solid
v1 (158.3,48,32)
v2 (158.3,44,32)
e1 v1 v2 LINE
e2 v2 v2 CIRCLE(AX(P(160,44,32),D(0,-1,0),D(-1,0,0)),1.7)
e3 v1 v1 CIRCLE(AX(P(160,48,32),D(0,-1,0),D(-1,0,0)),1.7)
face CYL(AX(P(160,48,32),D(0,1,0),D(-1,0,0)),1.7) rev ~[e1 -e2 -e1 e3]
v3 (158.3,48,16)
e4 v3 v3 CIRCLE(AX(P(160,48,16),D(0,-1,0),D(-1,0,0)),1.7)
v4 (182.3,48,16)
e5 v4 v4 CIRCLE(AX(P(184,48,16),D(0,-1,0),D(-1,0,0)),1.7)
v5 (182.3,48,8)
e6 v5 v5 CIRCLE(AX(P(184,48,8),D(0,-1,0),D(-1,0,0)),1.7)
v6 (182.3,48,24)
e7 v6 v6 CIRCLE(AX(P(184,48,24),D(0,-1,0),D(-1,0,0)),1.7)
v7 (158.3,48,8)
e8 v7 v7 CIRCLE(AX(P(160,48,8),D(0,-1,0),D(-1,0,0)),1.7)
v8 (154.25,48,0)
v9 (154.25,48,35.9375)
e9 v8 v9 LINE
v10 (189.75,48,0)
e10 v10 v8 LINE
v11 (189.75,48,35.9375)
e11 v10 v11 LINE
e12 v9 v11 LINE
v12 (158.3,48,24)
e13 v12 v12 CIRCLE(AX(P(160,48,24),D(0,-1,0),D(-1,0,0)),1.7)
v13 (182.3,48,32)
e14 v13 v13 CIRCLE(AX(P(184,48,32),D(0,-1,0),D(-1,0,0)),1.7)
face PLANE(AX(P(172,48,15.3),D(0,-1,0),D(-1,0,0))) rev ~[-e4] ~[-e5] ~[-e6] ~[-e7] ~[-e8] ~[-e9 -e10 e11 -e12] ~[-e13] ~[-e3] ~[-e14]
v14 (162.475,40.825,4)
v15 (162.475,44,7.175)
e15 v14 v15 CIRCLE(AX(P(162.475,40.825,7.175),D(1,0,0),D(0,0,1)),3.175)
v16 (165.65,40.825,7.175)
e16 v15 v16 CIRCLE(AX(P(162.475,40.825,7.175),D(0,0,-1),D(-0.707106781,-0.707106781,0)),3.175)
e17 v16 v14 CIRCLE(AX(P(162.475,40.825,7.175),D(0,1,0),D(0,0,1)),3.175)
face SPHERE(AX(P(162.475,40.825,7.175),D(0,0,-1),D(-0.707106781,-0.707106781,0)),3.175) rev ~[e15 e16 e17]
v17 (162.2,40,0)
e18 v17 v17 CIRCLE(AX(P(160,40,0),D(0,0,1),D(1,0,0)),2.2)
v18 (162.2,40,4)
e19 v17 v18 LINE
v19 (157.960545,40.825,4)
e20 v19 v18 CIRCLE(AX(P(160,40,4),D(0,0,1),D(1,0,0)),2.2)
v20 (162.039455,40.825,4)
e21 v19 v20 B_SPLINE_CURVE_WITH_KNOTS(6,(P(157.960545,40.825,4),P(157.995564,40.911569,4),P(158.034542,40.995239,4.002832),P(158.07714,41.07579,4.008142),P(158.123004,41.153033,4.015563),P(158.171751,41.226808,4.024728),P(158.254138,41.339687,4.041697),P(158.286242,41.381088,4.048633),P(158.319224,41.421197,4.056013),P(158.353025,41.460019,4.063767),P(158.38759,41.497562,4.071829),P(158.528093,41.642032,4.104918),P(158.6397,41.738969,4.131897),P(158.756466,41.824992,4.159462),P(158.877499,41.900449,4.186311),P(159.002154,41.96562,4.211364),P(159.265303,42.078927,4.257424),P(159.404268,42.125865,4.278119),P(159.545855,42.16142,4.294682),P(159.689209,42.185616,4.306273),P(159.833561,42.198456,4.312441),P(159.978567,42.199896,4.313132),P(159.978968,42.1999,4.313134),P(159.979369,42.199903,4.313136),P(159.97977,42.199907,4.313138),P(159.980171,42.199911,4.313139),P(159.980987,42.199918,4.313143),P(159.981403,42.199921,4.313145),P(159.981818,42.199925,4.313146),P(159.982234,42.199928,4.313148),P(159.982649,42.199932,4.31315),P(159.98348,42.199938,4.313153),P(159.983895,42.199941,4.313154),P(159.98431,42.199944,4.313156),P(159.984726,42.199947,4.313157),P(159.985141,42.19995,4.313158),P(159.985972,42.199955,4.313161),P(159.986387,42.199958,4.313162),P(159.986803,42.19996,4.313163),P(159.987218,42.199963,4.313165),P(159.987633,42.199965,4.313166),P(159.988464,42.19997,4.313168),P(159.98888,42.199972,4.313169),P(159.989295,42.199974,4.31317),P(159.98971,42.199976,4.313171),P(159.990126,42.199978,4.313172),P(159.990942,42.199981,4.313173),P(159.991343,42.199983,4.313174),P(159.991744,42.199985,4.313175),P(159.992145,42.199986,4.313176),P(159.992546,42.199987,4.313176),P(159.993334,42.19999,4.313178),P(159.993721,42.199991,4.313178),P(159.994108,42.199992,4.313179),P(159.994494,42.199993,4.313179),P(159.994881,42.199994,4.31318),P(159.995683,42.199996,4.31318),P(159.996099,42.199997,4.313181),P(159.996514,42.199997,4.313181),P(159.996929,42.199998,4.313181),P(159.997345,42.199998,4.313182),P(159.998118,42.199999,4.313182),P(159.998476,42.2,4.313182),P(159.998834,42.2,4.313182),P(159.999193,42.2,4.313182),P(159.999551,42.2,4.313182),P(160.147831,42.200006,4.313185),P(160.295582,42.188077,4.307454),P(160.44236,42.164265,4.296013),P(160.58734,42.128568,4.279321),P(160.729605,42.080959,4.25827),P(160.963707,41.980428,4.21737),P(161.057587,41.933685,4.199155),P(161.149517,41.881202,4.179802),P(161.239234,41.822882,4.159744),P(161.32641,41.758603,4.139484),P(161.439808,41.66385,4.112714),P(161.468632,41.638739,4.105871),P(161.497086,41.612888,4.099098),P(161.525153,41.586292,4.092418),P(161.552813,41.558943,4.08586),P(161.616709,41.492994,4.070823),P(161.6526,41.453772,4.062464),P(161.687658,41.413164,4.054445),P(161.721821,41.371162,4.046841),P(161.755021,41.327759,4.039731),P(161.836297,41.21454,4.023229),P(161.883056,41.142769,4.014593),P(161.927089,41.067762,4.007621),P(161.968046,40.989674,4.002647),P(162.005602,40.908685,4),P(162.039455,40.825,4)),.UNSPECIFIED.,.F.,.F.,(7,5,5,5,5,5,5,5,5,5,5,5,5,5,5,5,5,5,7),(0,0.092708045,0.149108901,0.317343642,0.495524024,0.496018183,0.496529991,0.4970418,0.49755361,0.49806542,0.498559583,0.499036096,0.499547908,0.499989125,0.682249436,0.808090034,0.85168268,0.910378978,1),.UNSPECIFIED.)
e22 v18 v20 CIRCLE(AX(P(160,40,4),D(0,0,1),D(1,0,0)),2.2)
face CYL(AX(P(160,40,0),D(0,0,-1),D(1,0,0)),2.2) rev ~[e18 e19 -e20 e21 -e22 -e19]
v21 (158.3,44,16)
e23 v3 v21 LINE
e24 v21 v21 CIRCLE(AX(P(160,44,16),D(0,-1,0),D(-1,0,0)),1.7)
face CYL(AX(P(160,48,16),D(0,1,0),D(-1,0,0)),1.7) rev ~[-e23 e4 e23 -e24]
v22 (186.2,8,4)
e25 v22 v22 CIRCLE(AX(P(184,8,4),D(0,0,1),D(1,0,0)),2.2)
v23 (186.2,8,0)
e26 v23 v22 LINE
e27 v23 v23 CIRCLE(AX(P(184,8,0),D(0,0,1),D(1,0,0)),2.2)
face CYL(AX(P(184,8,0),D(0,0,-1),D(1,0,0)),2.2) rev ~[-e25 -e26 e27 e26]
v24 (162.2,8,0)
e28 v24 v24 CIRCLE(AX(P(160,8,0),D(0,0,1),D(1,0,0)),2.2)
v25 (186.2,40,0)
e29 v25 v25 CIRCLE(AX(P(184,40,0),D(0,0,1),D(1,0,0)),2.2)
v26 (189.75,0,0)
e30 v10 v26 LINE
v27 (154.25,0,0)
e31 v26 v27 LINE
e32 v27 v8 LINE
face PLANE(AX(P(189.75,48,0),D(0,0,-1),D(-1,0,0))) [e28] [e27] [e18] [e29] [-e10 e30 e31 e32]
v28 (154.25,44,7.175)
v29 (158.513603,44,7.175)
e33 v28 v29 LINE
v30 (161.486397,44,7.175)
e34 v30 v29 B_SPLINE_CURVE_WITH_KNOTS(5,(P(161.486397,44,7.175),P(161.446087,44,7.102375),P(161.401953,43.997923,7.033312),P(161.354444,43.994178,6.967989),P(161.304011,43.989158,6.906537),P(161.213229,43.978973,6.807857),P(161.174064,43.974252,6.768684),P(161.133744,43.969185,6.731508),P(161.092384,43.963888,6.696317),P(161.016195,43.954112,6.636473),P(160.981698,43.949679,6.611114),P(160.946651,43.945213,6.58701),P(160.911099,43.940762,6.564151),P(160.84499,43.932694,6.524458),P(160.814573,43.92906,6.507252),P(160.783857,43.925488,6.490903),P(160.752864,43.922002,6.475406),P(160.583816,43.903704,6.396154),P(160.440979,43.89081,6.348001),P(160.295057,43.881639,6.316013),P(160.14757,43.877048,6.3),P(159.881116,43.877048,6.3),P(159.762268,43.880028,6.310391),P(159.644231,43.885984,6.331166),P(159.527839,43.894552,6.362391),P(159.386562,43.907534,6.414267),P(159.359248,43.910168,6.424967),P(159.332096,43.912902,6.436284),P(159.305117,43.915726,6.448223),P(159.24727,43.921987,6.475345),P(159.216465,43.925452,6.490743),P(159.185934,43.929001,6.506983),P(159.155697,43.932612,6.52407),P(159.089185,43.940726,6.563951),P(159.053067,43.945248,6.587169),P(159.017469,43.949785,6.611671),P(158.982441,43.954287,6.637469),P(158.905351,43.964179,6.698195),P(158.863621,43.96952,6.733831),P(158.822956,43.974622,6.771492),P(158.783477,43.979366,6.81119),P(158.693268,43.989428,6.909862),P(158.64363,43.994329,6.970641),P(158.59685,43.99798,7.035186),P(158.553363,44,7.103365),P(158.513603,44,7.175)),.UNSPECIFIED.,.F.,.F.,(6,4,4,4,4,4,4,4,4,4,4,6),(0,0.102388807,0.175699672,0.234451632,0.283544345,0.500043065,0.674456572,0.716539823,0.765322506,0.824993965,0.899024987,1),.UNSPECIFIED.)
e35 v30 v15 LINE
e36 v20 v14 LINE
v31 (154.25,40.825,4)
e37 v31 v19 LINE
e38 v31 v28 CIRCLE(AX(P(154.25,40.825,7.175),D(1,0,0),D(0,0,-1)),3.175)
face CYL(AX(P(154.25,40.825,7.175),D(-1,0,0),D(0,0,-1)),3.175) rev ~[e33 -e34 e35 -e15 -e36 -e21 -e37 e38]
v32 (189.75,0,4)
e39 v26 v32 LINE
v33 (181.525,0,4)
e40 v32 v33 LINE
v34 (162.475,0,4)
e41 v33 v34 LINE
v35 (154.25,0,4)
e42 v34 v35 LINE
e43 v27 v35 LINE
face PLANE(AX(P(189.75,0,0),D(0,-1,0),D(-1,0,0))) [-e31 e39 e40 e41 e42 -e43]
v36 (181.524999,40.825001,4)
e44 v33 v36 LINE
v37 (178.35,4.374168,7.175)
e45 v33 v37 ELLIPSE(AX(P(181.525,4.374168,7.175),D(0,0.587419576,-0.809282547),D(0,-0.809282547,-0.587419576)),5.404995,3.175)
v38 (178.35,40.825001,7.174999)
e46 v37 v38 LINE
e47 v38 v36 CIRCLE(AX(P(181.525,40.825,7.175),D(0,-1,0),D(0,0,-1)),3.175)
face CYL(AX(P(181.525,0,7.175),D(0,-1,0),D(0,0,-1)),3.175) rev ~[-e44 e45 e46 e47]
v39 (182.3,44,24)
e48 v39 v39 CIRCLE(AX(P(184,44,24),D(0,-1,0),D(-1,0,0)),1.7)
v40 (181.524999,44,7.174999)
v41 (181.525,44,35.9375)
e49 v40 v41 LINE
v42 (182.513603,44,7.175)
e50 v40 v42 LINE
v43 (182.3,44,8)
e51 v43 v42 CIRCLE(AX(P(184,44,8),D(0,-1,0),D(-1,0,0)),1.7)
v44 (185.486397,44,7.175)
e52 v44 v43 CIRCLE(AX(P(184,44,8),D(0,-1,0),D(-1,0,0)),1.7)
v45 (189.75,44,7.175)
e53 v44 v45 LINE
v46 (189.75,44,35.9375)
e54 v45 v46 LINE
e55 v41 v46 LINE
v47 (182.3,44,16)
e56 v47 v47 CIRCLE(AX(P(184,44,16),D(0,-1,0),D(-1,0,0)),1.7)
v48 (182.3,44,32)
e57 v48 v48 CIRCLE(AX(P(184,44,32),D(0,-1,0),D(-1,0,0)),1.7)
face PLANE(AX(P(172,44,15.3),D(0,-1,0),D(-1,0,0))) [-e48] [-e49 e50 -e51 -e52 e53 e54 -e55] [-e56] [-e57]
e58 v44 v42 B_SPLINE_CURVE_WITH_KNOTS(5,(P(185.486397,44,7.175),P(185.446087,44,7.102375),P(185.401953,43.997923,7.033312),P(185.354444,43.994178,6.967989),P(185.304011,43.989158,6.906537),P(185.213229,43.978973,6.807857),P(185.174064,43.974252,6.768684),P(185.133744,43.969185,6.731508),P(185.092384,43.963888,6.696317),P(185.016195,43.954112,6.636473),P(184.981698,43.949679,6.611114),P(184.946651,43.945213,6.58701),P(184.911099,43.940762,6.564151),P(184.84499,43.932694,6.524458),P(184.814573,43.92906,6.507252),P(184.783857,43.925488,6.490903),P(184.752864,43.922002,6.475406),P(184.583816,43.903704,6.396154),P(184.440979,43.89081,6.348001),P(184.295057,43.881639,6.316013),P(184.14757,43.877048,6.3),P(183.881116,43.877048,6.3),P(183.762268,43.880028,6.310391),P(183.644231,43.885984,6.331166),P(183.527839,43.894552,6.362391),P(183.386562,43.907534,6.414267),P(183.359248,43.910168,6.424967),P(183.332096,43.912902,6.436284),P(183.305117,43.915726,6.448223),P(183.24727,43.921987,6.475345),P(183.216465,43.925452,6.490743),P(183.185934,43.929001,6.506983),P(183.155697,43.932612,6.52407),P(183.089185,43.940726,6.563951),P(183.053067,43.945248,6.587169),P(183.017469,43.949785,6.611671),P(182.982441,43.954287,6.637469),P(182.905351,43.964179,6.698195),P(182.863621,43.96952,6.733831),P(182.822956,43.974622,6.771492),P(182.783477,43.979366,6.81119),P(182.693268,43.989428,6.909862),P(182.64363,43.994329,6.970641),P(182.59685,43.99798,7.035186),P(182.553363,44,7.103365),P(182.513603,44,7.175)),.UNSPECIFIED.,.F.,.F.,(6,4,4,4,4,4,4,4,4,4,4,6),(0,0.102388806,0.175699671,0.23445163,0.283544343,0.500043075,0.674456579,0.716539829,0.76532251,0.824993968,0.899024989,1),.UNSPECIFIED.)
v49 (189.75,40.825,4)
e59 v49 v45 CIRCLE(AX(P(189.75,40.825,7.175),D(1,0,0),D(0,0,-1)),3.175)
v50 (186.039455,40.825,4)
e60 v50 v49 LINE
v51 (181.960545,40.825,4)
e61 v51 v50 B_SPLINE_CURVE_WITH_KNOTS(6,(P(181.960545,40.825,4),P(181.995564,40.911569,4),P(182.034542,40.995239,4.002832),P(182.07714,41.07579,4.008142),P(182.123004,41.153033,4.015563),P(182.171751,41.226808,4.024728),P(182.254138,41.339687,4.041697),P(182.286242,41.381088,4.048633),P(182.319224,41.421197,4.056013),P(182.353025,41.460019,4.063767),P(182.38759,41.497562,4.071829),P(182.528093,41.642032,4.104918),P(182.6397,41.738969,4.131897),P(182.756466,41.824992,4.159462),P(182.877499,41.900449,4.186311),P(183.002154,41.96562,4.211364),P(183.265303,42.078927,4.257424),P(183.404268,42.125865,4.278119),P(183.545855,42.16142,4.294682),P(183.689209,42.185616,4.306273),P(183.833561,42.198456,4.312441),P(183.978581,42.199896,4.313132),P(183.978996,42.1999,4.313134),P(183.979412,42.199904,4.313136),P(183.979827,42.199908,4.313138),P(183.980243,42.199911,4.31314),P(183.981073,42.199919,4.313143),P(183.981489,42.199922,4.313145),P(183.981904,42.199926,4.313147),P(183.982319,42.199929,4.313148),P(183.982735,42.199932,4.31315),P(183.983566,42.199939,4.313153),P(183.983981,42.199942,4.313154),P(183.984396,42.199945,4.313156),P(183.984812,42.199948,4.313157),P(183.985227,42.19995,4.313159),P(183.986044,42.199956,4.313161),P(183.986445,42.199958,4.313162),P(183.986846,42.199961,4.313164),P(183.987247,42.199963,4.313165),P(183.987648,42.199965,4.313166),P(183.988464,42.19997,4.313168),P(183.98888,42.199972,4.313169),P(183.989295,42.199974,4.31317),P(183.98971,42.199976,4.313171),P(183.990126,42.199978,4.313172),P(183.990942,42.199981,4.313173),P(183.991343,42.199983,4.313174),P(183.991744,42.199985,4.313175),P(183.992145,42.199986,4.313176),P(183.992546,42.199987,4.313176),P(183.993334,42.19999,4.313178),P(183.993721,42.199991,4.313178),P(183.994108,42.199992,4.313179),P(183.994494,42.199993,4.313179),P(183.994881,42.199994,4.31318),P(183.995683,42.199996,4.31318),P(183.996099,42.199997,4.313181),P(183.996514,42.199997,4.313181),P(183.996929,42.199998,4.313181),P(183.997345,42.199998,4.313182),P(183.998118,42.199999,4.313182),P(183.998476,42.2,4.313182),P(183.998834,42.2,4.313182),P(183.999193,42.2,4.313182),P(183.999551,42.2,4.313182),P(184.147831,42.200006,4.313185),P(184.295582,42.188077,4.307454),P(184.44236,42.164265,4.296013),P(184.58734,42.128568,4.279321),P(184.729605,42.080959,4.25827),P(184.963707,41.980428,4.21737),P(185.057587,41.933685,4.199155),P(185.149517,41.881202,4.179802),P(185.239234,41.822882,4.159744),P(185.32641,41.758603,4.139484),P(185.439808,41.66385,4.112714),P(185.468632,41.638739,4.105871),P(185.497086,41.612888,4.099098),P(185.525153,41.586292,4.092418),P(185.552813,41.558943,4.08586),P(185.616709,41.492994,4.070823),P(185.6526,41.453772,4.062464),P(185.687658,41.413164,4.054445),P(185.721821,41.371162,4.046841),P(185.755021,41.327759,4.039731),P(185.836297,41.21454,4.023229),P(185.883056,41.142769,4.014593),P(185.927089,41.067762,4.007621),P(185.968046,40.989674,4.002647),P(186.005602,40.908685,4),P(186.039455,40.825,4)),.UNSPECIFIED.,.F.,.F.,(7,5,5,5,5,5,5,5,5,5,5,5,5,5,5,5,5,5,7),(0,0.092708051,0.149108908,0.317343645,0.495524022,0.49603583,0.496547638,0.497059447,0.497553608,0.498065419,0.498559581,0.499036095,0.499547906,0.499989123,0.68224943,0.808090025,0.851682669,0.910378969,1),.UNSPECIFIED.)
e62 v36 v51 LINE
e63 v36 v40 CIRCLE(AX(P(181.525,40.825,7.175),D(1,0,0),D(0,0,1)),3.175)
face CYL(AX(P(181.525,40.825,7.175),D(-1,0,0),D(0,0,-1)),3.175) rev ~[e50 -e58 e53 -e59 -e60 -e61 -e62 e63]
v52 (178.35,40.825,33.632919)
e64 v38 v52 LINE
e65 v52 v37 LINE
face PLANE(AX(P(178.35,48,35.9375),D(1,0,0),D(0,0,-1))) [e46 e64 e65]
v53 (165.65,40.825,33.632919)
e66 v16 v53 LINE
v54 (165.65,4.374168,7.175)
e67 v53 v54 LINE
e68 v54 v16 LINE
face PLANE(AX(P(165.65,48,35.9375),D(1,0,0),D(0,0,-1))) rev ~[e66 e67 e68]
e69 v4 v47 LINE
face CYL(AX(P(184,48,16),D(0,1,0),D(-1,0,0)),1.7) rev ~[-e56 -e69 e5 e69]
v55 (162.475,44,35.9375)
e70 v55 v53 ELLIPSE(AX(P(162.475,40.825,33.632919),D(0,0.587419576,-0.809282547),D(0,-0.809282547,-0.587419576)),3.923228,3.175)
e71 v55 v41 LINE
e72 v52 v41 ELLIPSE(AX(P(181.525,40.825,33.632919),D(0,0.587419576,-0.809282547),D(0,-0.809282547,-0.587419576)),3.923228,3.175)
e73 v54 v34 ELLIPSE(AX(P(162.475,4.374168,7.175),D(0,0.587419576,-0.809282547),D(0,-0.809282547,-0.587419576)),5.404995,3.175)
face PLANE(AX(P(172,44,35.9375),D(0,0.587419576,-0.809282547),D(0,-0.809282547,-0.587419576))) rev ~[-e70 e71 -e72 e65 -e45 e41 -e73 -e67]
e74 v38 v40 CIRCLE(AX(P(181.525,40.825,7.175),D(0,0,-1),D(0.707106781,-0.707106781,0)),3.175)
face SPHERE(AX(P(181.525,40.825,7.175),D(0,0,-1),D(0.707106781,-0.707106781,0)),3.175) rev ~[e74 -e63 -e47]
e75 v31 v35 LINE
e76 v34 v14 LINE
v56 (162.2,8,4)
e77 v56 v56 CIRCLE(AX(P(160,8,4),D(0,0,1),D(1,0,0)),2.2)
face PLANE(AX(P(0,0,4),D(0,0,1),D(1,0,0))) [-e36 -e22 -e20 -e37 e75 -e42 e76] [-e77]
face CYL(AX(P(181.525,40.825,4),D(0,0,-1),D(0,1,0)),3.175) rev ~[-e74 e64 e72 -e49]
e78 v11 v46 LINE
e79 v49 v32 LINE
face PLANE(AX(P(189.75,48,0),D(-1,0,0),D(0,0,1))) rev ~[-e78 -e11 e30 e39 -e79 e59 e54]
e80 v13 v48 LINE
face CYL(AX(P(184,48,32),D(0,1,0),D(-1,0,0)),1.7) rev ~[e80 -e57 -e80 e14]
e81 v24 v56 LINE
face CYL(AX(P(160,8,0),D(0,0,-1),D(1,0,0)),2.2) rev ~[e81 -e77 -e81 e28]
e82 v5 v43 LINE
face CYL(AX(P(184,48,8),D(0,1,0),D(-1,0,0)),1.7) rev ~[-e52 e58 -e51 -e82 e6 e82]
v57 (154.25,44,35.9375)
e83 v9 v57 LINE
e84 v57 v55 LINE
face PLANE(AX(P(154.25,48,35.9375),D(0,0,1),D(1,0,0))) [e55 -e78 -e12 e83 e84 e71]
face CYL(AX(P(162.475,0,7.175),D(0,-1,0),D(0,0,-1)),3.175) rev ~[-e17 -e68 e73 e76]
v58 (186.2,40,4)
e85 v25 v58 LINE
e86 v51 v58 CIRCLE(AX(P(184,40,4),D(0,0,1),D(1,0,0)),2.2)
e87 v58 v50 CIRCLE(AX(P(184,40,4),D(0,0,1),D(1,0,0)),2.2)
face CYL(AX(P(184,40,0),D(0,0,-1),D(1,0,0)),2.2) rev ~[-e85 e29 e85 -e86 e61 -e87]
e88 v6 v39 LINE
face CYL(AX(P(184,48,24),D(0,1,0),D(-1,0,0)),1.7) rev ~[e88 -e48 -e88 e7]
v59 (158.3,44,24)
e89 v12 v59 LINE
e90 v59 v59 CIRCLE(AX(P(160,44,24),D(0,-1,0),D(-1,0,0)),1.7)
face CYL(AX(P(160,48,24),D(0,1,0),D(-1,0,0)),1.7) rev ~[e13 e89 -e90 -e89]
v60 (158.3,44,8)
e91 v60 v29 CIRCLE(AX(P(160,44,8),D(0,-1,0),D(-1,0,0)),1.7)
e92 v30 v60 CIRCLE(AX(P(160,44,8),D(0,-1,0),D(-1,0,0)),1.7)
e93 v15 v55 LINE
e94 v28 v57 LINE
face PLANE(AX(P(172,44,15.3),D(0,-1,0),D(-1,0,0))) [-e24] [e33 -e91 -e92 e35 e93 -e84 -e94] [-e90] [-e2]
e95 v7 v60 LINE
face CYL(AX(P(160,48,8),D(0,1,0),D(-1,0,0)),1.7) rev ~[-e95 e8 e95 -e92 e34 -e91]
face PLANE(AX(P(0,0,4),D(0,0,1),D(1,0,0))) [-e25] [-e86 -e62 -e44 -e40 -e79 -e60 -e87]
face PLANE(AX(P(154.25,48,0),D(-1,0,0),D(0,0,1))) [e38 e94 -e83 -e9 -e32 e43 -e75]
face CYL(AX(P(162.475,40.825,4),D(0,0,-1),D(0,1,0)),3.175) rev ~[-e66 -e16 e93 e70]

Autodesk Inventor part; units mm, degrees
ref_plane "Work Plane1" through (172, 48, 15.3) normal (0, -1, 0) x (-1, 0, 0)
sketch "Sketch1" plane through (172, 48, 15.3) normal (0, -1, 0) x (-1, 0, 0)
  circle A0 centre (12, -16.7) radius 1.7 construction
  circle A1 centre (12, -32.7) radius 1.7 construction
  circle A2 centre (-12, 7.3) radius 1.7 construction
  circle A3 centre (-12, 15.3) radius 1.7 construction
  circle A4 centre (-12, 23.3) radius 1.7 construction
  circle A5 centre (-12, -24.7) radius 1.7 construction
  circle A6 centre (12, 23.3) radius 1.7 construction
  circle A7 centre (12, -56.7) radius 1.7 construction
  circle A8 centre (12, -48.7) radius 1.7 construction
  circle A9 centre (12, -40.7) radius 1.7 construction
  circle A10 centre (12, -8.7) radius 1.7 construction
  circle A11 centre (-12, -16.7) radius 1.7 construction
  circle A12 centre (12, -24.7) radius 1.7 construction
  circle A13 centre (-12, -0.7) radius 1.7 construction
  circle A14 centre (-12, -40.7) radius 1.7 construction
  circle A15 centre (-12, -48.7) radius 1.7 construction
  circle A16 centre (-12, -56.7) radius 1.7 construction
  circle A17 centre (-12, -32.7) radius 1.7 construction
  circle A18 centre (12, -80.7) radius 1.7 construction
  circle A19 centre (12, 15.3) radius 1.7 construction
  circle A20 centre (12, 7.3) radius 1.7 construction
  circle A21 centre (12, -0.7) radius 1.7 construction
  circle A22 centre (-12, -8.7) radius 1.7 construction
  circle A23 centre (-12, -80.7) radius 1.7 construction
  line L0 (10.05, 51.5627) -> (14.45, 51.5627) construction
  line L1 (14.45, 51.5627) -> (14.45, 45.5871) construction
  line L2 (14.45, 45.5871) -> (10.05, 45.5871) construction
  line L3 (10.05, 45.5871) -> (10.05, 51.5627) construction
  line L4 (10.05, -66.0122) -> (14.45, -66.0122) construction
  line L5 (14.45, -66.0122) -> (14.45, -71.9878) construction
  line L6 (14.45, -71.9878) -> (10.05, -71.9878) construction
  line L7 (10.05, -71.9878) -> (10.05, -66.0122) construction
  line L8 (-10.05, 75.3622) -> (-14.45, 75.3622) construction
  line L9 (-14.45, 75.3622) -> (-14.45, 81.3378) construction
  line L10 (-14.45, 81.3378) -> (-10.05, 81.3378) construction
  line L11 (-10.05, 81.3378) -> (-10.05, 75.3622) construction
  line L12 (-14.45, 56.302) -> (-10.05, 56.302) construction
  line L13 (-10.05, 56.302) -> (-10.05, 50.3264) construction
  line L14 (-10.05, 50.3264) -> (-14.45, 50.3264) construction
  line L15 (-14.45, 50.3264) -> (-14.45, 56.302) construction
  line L16 (9.5604, 33.925) -> (12.375, 35.55) construction
  line L17 (12.375, 35.55) -> (15.1896, 33.925) construction
  line L18 (15.1896, 33.925) -> (15.1896, 30.675) construction
  line L19 (15.1896, 30.675) -> (12.375, 29.05) construction
  line L20 (12.375, 29.05) -> (9.5604, 30.675) construction
  line L21 (9.5604, 30.675) -> (9.5604, 33.925) construction
  line L22 (2.8106, 33.925) -> (5.6252, 35.55) construction
  line L23 (5.6252, 35.55) -> (8.4398, 33.925) construction
  line L24 (8.4398, 33.925) -> (8.4398, 30.675) construction
  line L25 (8.4398, 30.675) -> (5.6252, 29.05) construction
  line L26 (5.6252, 29.05) -> (2.8106, 30.675) construction
  line L27 (2.8106, 30.675) -> (2.8106, 33.925) construction
  line L28 (3.2502, 68.3) -> (3.2502, 81) construction
  line L29 (3.2502, 81) -> (8.0002, 81) construction
  line L30 (8.0002, 81) -> (8.0002, 68.3) construction
  line L31 (8.0002, 68.3) -> (3.2502, 68.3) construction
  circle A24 centre (12.375, 40.3) radius 1.7 construction
  circle A25 centre (5.6252, 40.3) radius 1.7 construction
  line L32 (10.0002, 81) -> (14.75, 81) construction
  line L33 (14.75, 81) -> (14.75, 68.3) construction
  line L34 (14.75, 68.3) -> (10.0002, 68.3) construction
  line L35 (10.0002, 68.3) -> (10.0002, 81) construction
  line L36 (3.2502, 53.6) -> (3.2502, 66.3) construction
  line L37 (3.2502, 66.3) -> (8.0002, 66.3) construction
  line L38 (8.0002, 66.3) -> (8.0002, 53.6) construction
  line L39 (8.0002, 53.6) -> (3.2502, 53.6) construction
  circle A26 centre (-7.75, 60) radius 1.7 construction
  circle A27 centre (-7.75, -75) radius 1.7 construction
  line L40 (-6.125, 72.8146) -> (-4.5, 70) construction
  line L41 (-4.5, 70) -> (-6.125, 67.1854) construction
  line L42 (-6.125, 67.1854) -> (-9.375, 67.1854) construction
  line L43 (-9.375, 67.1854) -> (-11, 70) construction
  line L44 (-11, 70) -> (-9.375, 72.8146) construction
  line L45 (-9.375, 72.8146) -> (-6.125, 72.8146) construction
  line L46 (-6.125, -62.1854) -> (-4.5, -65) construction
  line L47 (-4.5, -65) -> (-6.125, -67.8146) construction
  line L48 (-6.125, -67.8146) -> (-9.375, -67.8146) construction
  line L49 (-9.375, -67.8146) -> (-11, -65) construction
  line L50 (-11, -65) -> (-9.375, -62.1854) construction
  line L51 (-9.375, -62.1854) -> (-6.125, -62.1854) construction
  line L52 (17.75, 85) -> (-17.75, 85) construction
  line L53 (-17.75, 85) -> (-17.75, -85) construction
  line L54 (-17.75, -85) -> (17.75, -85) construction
  line L55 (17.75, -85) -> (17.75, 85) construction
  line L56 (172, 15.3) -> (-20, 15.3) construction
  line L57 (-17.75, 15.3) -> (17.75, 15.3)
  line L58 (17.75, 15.3) -> (17.75, -20.6375)
  line L59 (17.75, -20.6375) -> (-17.75, -20.6375)
  line L60 (-17.75, 15.3) -> (-17.75, -20.6375)
  circle A28 centre (-12, 7.3) radius 1.7
  circle A29 centre (-12, -0.7) radius 1.7
  circle A30 centre (-12, -8.7) radius 1.7
  circle A31 centre (-12, -16.7) radius 1.7
  circle A32 centre (12, -16.7) radius 1.7
  circle A33 centre (12, -8.7) radius 1.7
  circle A34 centre (12, -0.7) radius 1.7
  circle A35 centre (12, 7.3) radius 1.7
extrude "Extrusion1" add sketch "Sketch1" along normal blind 4
ref_plane "Work Plane2" through (0, 0, 0) normal (0, 0, 1) x (1, 0, 0)
sketch "Sketch2" plane through (0, 0, 0) normal (0, 0, 1) x (1, 0, 0)
  line L0 (192, 0) -> (192, 48) construction
  line L1 (0, 48) -> (192, 48) construction
  line L2 (0, 0) -> (0, 48) construction
  line L3 (0, 0) -> (192, 0) construction
  circle A0 centre (168, 24) radius 7 construction
  circle A1 centre (144, 24) radius 7 construction
  arc A2 (160.9289, 33.8995) -> (158.1005, 31.0711) centre (159.5147, 32.4853) ccw construction
  line L4 (161.4142, 33.4142) -> (160.9289, 33.8995) construction
  arc A3 (158.5858, 30.5858) -> (161.4142, 33.4142) centre (160, 32) ccw construction
  line L5 (158.1005, 31.0711) -> (158.5858, 30.5858) construction
  line L6 (156.6863, 26) -> (155.3137, 26) construction
  arc A4 (156.6863, 22) -> (156.6863, 26) centre (156.6863, 24) ccw construction
  line L7 (155.3137, 22) -> (156.6863, 22) construction
  arc A5 (155.3137, 26) -> (155.3137, 22) centre (155.3137, 24) ccw construction
  arc A6 (158.1005, 16.9289) -> (160.9289, 14.1005) centre (159.5147, 15.5147) ccw construction
  line L8 (158.5858, 17.4142) -> (158.1005, 16.9289) construction
  arc A7 (161.4142, 14.5858) -> (158.5858, 17.4142) centre (160, 16) ccw construction
  line L9 (160.9289, 14.1005) -> (161.4142, 14.5858) construction
  arc A8 (177.8995, 31.0711) -> (175.0711, 33.8995) centre (176.4853, 32.4853) ccw construction
  line L10 (177.4142, 30.5858) -> (177.8995, 31.0711) construction
  arc A9 (174.5858, 33.4142) -> (177.4142, 30.5858) centre (176, 32) ccw construction
  line L11 (175.0711, 33.8995) -> (174.5858, 33.4142) construction
  arc A10 (180.6863, 22) -> (180.6863, 26) centre (180.6863, 24) ccw construction
  line L12 (179.3137, 22) -> (180.6863, 22) construction
  arc A11 (179.3137, 26) -> (179.3137, 22) centre (179.3137, 24) ccw construction
  line L13 (180.6863, 26) -> (179.3137, 26) construction
  line L14 (170, 35.3137) -> (170, 40) construction
  arc A12 (166, 35.3137) -> (170, 35.3137) centre (168, 35.3137) ccw construction
  line L15 (166, 40) -> (166, 35.3137) construction
  arc A13 (170, 40) -> (166, 40) centre (168, 40) ccw construction
  circle A14 centre (160, 40) radius 2 construction
  circle A15 centre (152, 40) radius 2 construction
  line L16 (146, 35.3137) -> (146, 40) construction
  arc A16 (142, 35.3137) -> (146, 35.3137) centre (144, 35.3137) ccw construction
  line L17 (142, 40) -> (142, 35.3137) construction
  arc A17 (146, 40) -> (142, 40) centre (144, 40) ccw construction
  circle A18 centre (136, 40) radius 2 construction
  circle A19 centre (128, 40) radius 2 construction
  line L18 (122, 35.3137) -> (122, 40) construction
  arc A20 (118, 35.3137) -> (122, 35.3137) centre (120, 35.3137) ccw construction
  line L19 (118, 40) -> (118, 35.3137) construction
  arc A21 (122, 40) -> (118, 40) centre (120, 40) ccw construction
  circle A22 centre (112, 40) radius 2 construction
  circle A23 centre (104, 40) radius 2 construction
  line L20 (98, 35.3137) -> (98, 40) construction
  arc A24 (94, 35.3137) -> (98, 35.3137) centre (96, 35.3137) ccw construction
  line L21 (94, 40) -> (94, 35.3137) construction
  arc A25 (98, 40) -> (94, 40) centre (96, 40) ccw construction
  circle A26 centre (88, 40) radius 2 construction
  circle A27 centre (80, 40) radius 2 construction
  line L22 (74, 35.3137) -> (74, 40) construction
  arc A28 (70, 35.3137) -> (74, 35.3137) centre (72, 35.3137) ccw construction
  line L23 (70, 40) -> (70, 35.3137) construction
  arc A29 (74, 40) -> (70, 40) centre (72, 40) ccw construction
  circle A30 centre (64, 40) radius 2 construction
  circle A31 centre (56, 40) radius 2 construction
  line L24 (50, 35.3137) -> (50, 40) construction
  arc A32 (46, 35.3137) -> (50, 35.3137) centre (48, 35.3137) ccw construction
  line L25 (46, 40) -> (46, 35.3137) construction
  arc A33 (50, 40) -> (46, 40) centre (48, 40) ccw construction
  circle A34 centre (40, 40) radius 2 construction
  circle A35 centre (32, 40) radius 2 construction
  line L26 (26, 35.3137) -> (26, 40) construction
  arc A36 (22, 35.3137) -> (26, 35.3137) centre (24, 35.3137) ccw construction
  line L27 (22, 40) -> (22, 35.3137) construction
  arc A37 (26, 40) -> (22, 40) centre (24, 40) ccw construction
  circle A38 centre (16, 40) radius 2 construction
  circle A39 centre (8, 40) radius 2 construction
  line L28 (166, 12.6863) -> (166, 8) construction
  arc A40 (170, 12.6863) -> (166, 12.6863) centre (168, 12.6863) ccw construction
  line L29 (170, 8) -> (170, 12.6863) construction
  arc A41 (166, 8) -> (170, 8) centre (168, 8) ccw construction
  circle A42 centre (160, 8) radius 2 construction
  circle A43 centre (152, 8) radius 2 construction
  line L30 (142, 12.6863) -> (142, 8) construction
  arc A44 (146, 12.6863) -> (142, 12.6863) centre (144, 12.6863) ccw construction
  line L31 (146, 8) -> (146, 12.6863) construction
  arc A45 (142, 8) -> (146, 8) centre (144, 8) ccw construction
  circle A46 centre (136, 8) radius 2 construction
  circle A47 centre (128, 8) radius 2 construction
  line L32 (118, 12.6863) -> (118, 8) construction
  arc A48 (122, 12.6863) -> (118, 12.6863) centre (120, 12.6863) ccw construction
  line L33 (122, 8) -> (122, 12.6863) construction
  arc A49 (118, 8) -> (122, 8) centre (120, 8) ccw construction
  circle A50 centre (112, 8) radius 2 construction
  circle A51 centre (104, 8) radius 2 construction
  line L34 (94, 12.6863) -> (94, 8) construction
  arc A52 (98, 12.6863) -> (94, 12.6863) centre (96, 12.6863) ccw construction
  line L35 (98, 8) -> (98, 12.6863) construction
  arc A53 (94, 8) -> (98, 8) centre (96, 8) ccw construction
  circle A54 centre (88, 8) radius 2 construction
  circle A55 centre (80, 8) radius 2 construction
  line L36 (70, 12.6863) -> (70, 8) construction
  arc A56 (74, 12.6863) -> (70, 12.6863) centre (72, 12.6863) ccw construction
  line L37 (74, 8) -> (74, 12.6863) construction
  arc A57 (70, 8) -> (74, 8) centre (72, 8) ccw construction
  circle A58 centre (64, 8) radius 2 construction
  circle A59 centre (56, 8) radius 2 construction
  line L38 (46, 12.6863) -> (46, 8) construction
  arc A60 (50, 12.6863) -> (46, 12.6863) centre (48, 12.6863) ccw construction
  line L39 (50, 8) -> (50, 12.6863) construction
  arc A61 (46, 8) -> (50, 8) centre (48, 8) ccw construction
  circle A62 centre (40, 8) radius 2 construction
  circle A63 centre (32, 8) radius 2 construction
  line L40 (22, 12.6863) -> (22, 8) construction
  arc A64 (26, 12.6863) -> (22, 12.6863) centre (24, 12.6863) ccw construction
  line L41 (26, 8) -> (26, 12.6863) construction
  arc A65 (22, 8) -> (26, 8) centre (24, 8) ccw construction
  circle A66 centre (16, 8) radius 2 construction
  circle A67 centre (8, 8) radius 2 construction
  arc A68 (9.8995, 31.0711) -> (7.0711, 33.8995) centre (8.4853, 32.4853) ccw construction
  line L42 (9.4142, 30.5858) -> (9.8995, 31.0711) construction
  arc A69 (6.5858, 33.4142) -> (9.4142, 30.5858) centre (8, 32) ccw construction
  line L43 (7.0711, 33.8995) -> (6.5858, 33.4142) construction
  arc A70 (7.0711, 14.1005) -> (9.8995, 16.9289) centre (8.4853, 15.5147) ccw construction
  line L44 (6.5858, 14.5858) -> (7.0711, 14.1005) construction
  arc A71 (9.4142, 17.4142) -> (6.5858, 14.5858) centre (8, 16) ccw construction
  line L45 (9.8995, 16.9289) -> (9.4142, 17.4142) construction
  arc A72 (184.9289, 33.8995) -> (182.1005, 31.0711) centre (183.5147, 32.4853) ccw construction
  line L46 (185.4142, 33.4142) -> (184.9289, 33.8995) construction
  arc A73 (182.5858, 30.5858) -> (185.4142, 33.4142) centre (184, 32) ccw construction
  line L47 (182.1005, 31.0711) -> (182.5858, 30.5858) construction
  arc A74 (182.1005, 16.9289) -> (184.9289, 14.1005) centre (183.5147, 15.5147) ccw construction
  line L48 (182.5858, 17.4142) -> (182.1005, 16.9289) construction
  arc A75 (185.4142, 14.5858) -> (182.5858, 17.4142) centre (184, 16) ccw construction
  line L49 (184.9289, 14.1005) -> (185.4142, 14.5858) construction
  circle A76 centre (176, 8) radius 2 construction
  circle A77 centre (176, 40) radius 2 construction
  circle A78 centre (184, 40) radius 2 construction
  circle A79 centre (184, 8) radius 2 construction
  arc A80 (33.8995, 31.0711) -> (31.0711, 33.8995) centre (32.4853, 32.4853) ccw construction
  line L50 (33.4142, 30.5858) -> (33.8995, 31.0711) construction
  arc A81 (30.5858, 33.4142) -> (33.4142, 30.5858) centre (32, 32) ccw construction
  line L51 (31.0711, 33.8995) -> (30.5858, 33.4142) construction
  arc A82 (57.8995, 31.0711) -> (55.0711, 33.8995) centre (56.4853, 32.4853) ccw construction
  line L52 (57.4142, 30.5858) -> (57.8995, 31.0711) construction
  arc A83 (54.5858, 33.4142) -> (57.4142, 30.5858) centre (56, 32) ccw construction
  line L53 (55.0711, 33.8995) -> (54.5858, 33.4142) construction
  arc A84 (81.8995, 31.0711) -> (79.0711, 33.8995) centre (80.4853, 32.4853) ccw construction
  line L54 (81.4142, 30.5858) -> (81.8995, 31.0711) construction
  arc A85 (78.5858, 33.4142) -> (81.4142, 30.5858) centre (80, 32) ccw construction
  line L55 (79.0711, 33.8995) -> (78.5858, 33.4142) construction
  arc A86 (105.8995, 31.0711) -> (103.0711, 33.8995) centre (104.4853, 32.4853) ccw construction
  line L56 (105.4142, 30.5858) -> (105.8995, 31.0711) construction
  arc A87 (102.5858, 33.4142) -> (105.4142, 30.5858) centre (104, 32) ccw construction
  line L57 (103.0711, 33.8995) -> (102.5858, 33.4142) construction
  arc A88 (129.8995, 31.0711) -> (127.0711, 33.8995) centre (128.4853, 32.4853) ccw construction
  line L58 (129.4142, 30.5858) -> (129.8995, 31.0711) construction
  arc A89 (126.5858, 33.4142) -> (129.4142, 30.5858) centre (128, 32) ccw construction
  line L59 (127.0711, 33.8995) -> (126.5858, 33.4142) construction
  arc A90 (153.8995, 31.0711) -> (151.0711, 33.8995) centre (152.4853, 32.4853) ccw construction
  line L60 (153.4142, 30.5858) -> (153.8995, 31.0711) construction
  arc A91 (150.5858, 33.4142) -> (153.4142, 30.5858) centre (152, 32) ccw construction
  line L61 (151.0711, 33.8995) -> (150.5858, 33.4142) construction
  arc A92 (14.1005, 16.9289) -> (16.9289, 14.1005) centre (15.5147, 15.5147) ccw construction
  line L62 (14.5858, 17.4142) -> (14.1005, 16.9289) construction
  arc A93 (17.4142, 14.5858) -> (14.5858, 17.4142) centre (16, 16) ccw construction
  line L63 (16.9289, 14.1005) -> (17.4142, 14.5858) construction
  arc A94 (38.1005, 16.9289) -> (40.9289, 14.1005) centre (39.5147, 15.5147) ccw construction
  line L64 (38.5858, 17.4142) -> (38.1005, 16.9289) construction
  arc A95 (41.4142, 14.5858) -> (38.5858, 17.4142) centre (40, 16) ccw construction
  line L65 (40.9289, 14.1005) -> (41.4142, 14.5858) construction
  arc A96 (62.1005, 16.9289) -> (64.9289, 14.1005) centre (63.5147, 15.5147) ccw construction
  line L66 (62.5858, 17.4142) -> (62.1005, 16.9289) construction
  arc A97 (65.4142, 14.5858) -> (62.5858, 17.4142) centre (64, 16) ccw construction
  line L67 (64.9289, 14.1005) -> (65.4142, 14.5858) construction
  arc A98 (86.1005, 16.9289) -> (88.9289, 14.1005) centre (87.5147, 15.5147) ccw construction
  line L68 (86.5858, 17.4142) -> (86.1005, 16.9289) construction
  arc A99 (89.4142, 14.5858) -> (86.5858, 17.4142) centre (88, 16) ccw construction
  line L69 (88.9289, 14.1005) -> (89.4142, 14.5858) construction
  arc A100 (110.1005, 16.9289) -> (112.9289, 14.1005) centre (111.5147, 15.5147) ccw construction
  line L70 (110.5858, 17.4142) -> (110.1005, 16.9289) construction
  arc A101 (113.4142, 14.5858) -> (110.5858, 17.4142) centre (112, 16) ccw construction
  line L71 (112.9289, 14.1005) -> (113.4142, 14.5858) construction
  arc A102 (134.1005, 16.9289) -> (136.9289, 14.1005) centre (135.5147, 15.5147) ccw construction
  line L72 (134.5858, 17.4142) -> (134.1005, 16.9289) construction
  arc A103 (137.4142, 14.5858) -> (134.5858, 17.4142) centre (136, 16) ccw construction
  line L73 (136.9289, 14.1005) -> (137.4142, 14.5858) construction
  line L74 (11.3137, 22) -> (12.6863, 22) construction
  arc A104 (11.3137, 26) -> (11.3137, 22) centre (11.3137, 24) ccw construction
  line L75 (12.6863, 26) -> (11.3137, 26) construction
  arc A105 (12.6863, 22) -> (12.6863, 26) centre (12.6863, 24) ccw construction
  line L76 (36.6863, 26) -> (35.3137, 26) construction
  arc A106 (36.6863, 22) -> (36.6863, 26) centre (36.6863, 24) ccw construction
  line L77 (35.3137, 22) -> (36.6863, 22) construction
  arc A107 (35.3137, 26) -> (35.3137, 22) centre (35.3137, 24) ccw construction
  line L78 (60.6863, 26) -> (59.3137, 26) construction
  arc A108 (60.6863, 22) -> (60.6863, 26) centre (60.6863, 24) ccw construction
  line L79 (59.3137, 22) -> (60.6863, 22) construction
  arc A109 (59.3137, 26) -> (59.3137, 22) centre (59.3137, 24) ccw construction
  line L80 (84.6863, 26) -> (83.3137, 26) construction
  arc A110 (84.6863, 22) -> (84.6863, 26) centre (84.6863, 24) ccw construction
  line L81 (83.3137, 22) -> (84.6863, 22) construction
  arc A111 (83.3137, 26) -> (83.3137, 22) centre (83.3137, 24) ccw construction
  line L82 (108.6863, 26) -> (107.3137, 26) construction
  arc A112 (108.6863, 22) -> (108.6863, 26) centre (108.6863, 24) ccw construction
  line L83 (107.3137, 22) -> (108.6863, 22) construction
  arc A113 (107.3137, 26) -> (107.3137, 22) centre (107.3137, 24) ccw construction
  line L84 (132.6863, 26) -> (131.3137, 26) construction
  arc A114 (132.6863, 22) -> (132.6863, 26) centre (132.6863, 24) ccw construction
  line L85 (131.3137, 22) -> (132.6863, 22) construction
  arc A115 (131.3137, 26) -> (131.3137, 22) centre (131.3137, 24) ccw construction
  arc A116 (16.9289, 33.8995) -> (14.1005, 31.0711) centre (15.5147, 32.4853) ccw construction
  line L86 (17.4142, 33.4142) -> (16.9289, 33.8995) construction
  arc A117 (14.5858, 30.5858) -> (17.4142, 33.4142) centre (16, 32) ccw construction
  line L87 (14.1005, 31.0711) -> (14.5858, 30.5858) construction
  arc A118 (40.9289, 33.8995) -> (38.1005, 31.0711) centre (39.5147, 32.4853) ccw construction
  line L88 (41.4142, 33.4142) -> (40.9289, 33.8995) construction
  arc A119 (38.5858, 30.5858) -> (41.4142, 33.4142) centre (40, 32) ccw construction
  line L89 (38.1005, 31.0711) -> (38.5858, 30.5858) construction
  arc A120 (64.9289, 33.8995) -> (62.1005, 31.0711) centre (63.5147, 32.4853) ccw construction
  line L90 (65.4142, 33.4142) -> (64.9289, 33.8995) construction
  arc A121 (62.5858, 30.5858) -> (65.4142, 33.4142) centre (64, 32) ccw construction
  line L91 (62.1005, 31.0711) -> (62.5858, 30.5858) construction
  arc A122 (88.9289, 33.8995) -> (86.1005, 31.0711) centre (87.5147, 32.4853) ccw construction
  line L92 (89.4142, 33.4142) -> (88.9289, 33.8995) construction
  arc A123 (86.5858, 30.5858) -> (89.4142, 33.4142) centre (88, 32) ccw construction
  line L93 (86.1005, 31.0711) -> (86.5858, 30.5858) construction
  arc A124 (112.9289, 33.8995) -> (110.1005, 31.0711) centre (111.5147, 32.4853) ccw construction
  line L94 (113.4142, 33.4142) -> (112.9289, 33.8995) construction
  arc A125 (110.5858, 30.5858) -> (113.4142, 33.4142) centre (112, 32) ccw construction
  line L95 (110.1005, 31.0711) -> (110.5858, 30.5858) construction
  arc A126 (136.9289, 33.8995) -> (134.1005, 31.0711) centre (135.5147, 32.4853) ccw construction
  line L96 (137.4142, 33.4142) -> (136.9289, 33.8995) construction
  arc A127 (134.5858, 30.5858) -> (137.4142, 33.4142) centre (136, 32) ccw construction
  line L97 (134.1005, 31.0711) -> (134.5858, 30.5858) construction
  arc A128 (31.0711, 14.1005) -> (33.8995, 16.9289) centre (32.4853, 15.5147) ccw construction
  line L98 (30.5858, 14.5858) -> (31.0711, 14.1005) construction
  arc A129 (33.4142, 17.4142) -> (30.5858, 14.5858) centre (32, 16) ccw construction
  line L99 (33.8995, 16.9289) -> (33.4142, 17.4142) construction
  arc A130 (55.0711, 14.1005) -> (57.8995, 16.9289) centre (56.4853, 15.5147) ccw construction
  line L100 (54.5858, 14.5858) -> (55.0711, 14.1005) construction
  arc A131 (57.4142, 17.4142) -> (54.5858, 14.5858) centre (56, 16) ccw construction
  line L101 (57.8995, 16.9289) -> (57.4142, 17.4142) construction
  arc A132 (79.0711, 14.1005) -> (81.8995, 16.9289) centre (80.4853, 15.5147) ccw construction
  line L102 (78.5858, 14.5858) -> (79.0711, 14.1005) construction
  arc A133 (81.4142, 17.4142) -> (78.5858, 14.5858) centre (80, 16) ccw construction
  line L103 (81.8995, 16.9289) -> (81.4142, 17.4142) construction
  arc A134 (103.0711, 14.1005) -> (105.8995, 16.9289) centre (104.4853, 15.5147) ccw construction
  line L104 (102.5858, 14.5858) -> (103.0711, 14.1005) construction
  arc A135 (105.4142, 17.4142) -> (102.5858, 14.5858) centre (104, 16) ccw construction
  line L105 (105.8995, 16.9289) -> (105.4142, 17.4142) construction
  arc A136 (127.0711, 14.1005) -> (129.8995, 16.9289) centre (128.4853, 15.5147) ccw construction
  line L106 (126.5858, 14.5858) -> (127.0711, 14.1005) construction
  arc A137 (129.4142, 17.4142) -> (126.5858, 14.5858) centre (128, 16) ccw construction
  line L107 (129.8995, 16.9289) -> (129.4142, 17.4142) construction
  arc A138 (151.0711, 14.1005) -> (153.8995, 16.9289) centre (152.4853, 15.5147) ccw construction
  line L108 (150.5858, 14.5858) -> (151.0711, 14.1005) construction
  arc A139 (153.4142, 17.4142) -> (150.5858, 14.5858) centre (152, 16) ccw construction
  line L109 (153.8995, 16.9289) -> (153.4142, 17.4142) construction
  arc A140 (175.0711, 14.1005) -> (177.8995, 16.9289) centre (176.4853, 15.5147) ccw construction
  line L110 (174.5858, 14.5858) -> (175.0711, 14.1005) construction
  arc A141 (177.4142, 17.4142) -> (174.5858, 14.5858) centre (176, 16) ccw construction
  line L111 (177.8995, 16.9289) -> (177.4142, 17.4142) construction
  circle A142 centre (24, 24) radius 7 construction
  circle A143 centre (48, 24) radius 7 construction
  circle A144 centre (72, 24) radius 7 construction
  circle A145 centre (96, 24) radius 7 construction
  circle A146 centre (120, 24) radius 7 construction
  circle A147 centre (184, 8) radius 2.2
  circle A148 centre (184, 40) radius 2.2
  circle A149 centre (160, 40) radius 2.2
  circle A150 centre (160, 8) radius 2.2
  line L112 (154.25, 44) -> (189.75, 44) projected
  line L113 (154.25, 44) -> (154.25, 0)
  line L114 (189.75, 0) -> (154.25, 0)
  line L115 (154.25, 44) -> (189.75, 44)
  line L116 (189.75, 48) -> (189.75, 44) projected
  line L117 (189.75, 44) -> (189.75, 0)
  point P0 (192, 44)
  dimension "d2" = 4.4
  dimension "d3" = 4.4
  dimension "d4" = 4.4
  dimension "d5" = 4.4
extrude "Extrusion2" add sketch "Sketch2" along normal blind 4
ref_plane "Work Plane3" through (172, 48, 35.9375) normal (1, 0, 0) x (0, 0, -1)
sketch "Sketch3" plane through (172, 48, 35.9375) normal (1, 0, 0) x (0, 0, -1)
  line L0 (31.9375, -48) -> (31.9375, -4) projected
  line L1 (31.9375, -4) -> (0, -4) projected
  line L2 (31.9375, -48) -> (31.9375, -4)
  line L3 (0, -4) -> (31.9375, -48)
  point P0 (35.9375, -48)
extrude "Extrusion3" add sketch "Sketch3" along normal mid plane 12.7
fillet "Fillet1" radius 3.175 4 edges at (178.35, 44, 19.9688) (178.35, 22, 4) (165.65, 22, 4) (165.65, 44, 19.9688)
fillet "Fillet2" radius 3.175 4 edges at (179.2799, 43.0701, 4.9299) (185.6375, 44, 4) (164.7201, 43.0701, 4.9299) (158.3625, 44, 4)
properties part number "crossbar bracket right"
